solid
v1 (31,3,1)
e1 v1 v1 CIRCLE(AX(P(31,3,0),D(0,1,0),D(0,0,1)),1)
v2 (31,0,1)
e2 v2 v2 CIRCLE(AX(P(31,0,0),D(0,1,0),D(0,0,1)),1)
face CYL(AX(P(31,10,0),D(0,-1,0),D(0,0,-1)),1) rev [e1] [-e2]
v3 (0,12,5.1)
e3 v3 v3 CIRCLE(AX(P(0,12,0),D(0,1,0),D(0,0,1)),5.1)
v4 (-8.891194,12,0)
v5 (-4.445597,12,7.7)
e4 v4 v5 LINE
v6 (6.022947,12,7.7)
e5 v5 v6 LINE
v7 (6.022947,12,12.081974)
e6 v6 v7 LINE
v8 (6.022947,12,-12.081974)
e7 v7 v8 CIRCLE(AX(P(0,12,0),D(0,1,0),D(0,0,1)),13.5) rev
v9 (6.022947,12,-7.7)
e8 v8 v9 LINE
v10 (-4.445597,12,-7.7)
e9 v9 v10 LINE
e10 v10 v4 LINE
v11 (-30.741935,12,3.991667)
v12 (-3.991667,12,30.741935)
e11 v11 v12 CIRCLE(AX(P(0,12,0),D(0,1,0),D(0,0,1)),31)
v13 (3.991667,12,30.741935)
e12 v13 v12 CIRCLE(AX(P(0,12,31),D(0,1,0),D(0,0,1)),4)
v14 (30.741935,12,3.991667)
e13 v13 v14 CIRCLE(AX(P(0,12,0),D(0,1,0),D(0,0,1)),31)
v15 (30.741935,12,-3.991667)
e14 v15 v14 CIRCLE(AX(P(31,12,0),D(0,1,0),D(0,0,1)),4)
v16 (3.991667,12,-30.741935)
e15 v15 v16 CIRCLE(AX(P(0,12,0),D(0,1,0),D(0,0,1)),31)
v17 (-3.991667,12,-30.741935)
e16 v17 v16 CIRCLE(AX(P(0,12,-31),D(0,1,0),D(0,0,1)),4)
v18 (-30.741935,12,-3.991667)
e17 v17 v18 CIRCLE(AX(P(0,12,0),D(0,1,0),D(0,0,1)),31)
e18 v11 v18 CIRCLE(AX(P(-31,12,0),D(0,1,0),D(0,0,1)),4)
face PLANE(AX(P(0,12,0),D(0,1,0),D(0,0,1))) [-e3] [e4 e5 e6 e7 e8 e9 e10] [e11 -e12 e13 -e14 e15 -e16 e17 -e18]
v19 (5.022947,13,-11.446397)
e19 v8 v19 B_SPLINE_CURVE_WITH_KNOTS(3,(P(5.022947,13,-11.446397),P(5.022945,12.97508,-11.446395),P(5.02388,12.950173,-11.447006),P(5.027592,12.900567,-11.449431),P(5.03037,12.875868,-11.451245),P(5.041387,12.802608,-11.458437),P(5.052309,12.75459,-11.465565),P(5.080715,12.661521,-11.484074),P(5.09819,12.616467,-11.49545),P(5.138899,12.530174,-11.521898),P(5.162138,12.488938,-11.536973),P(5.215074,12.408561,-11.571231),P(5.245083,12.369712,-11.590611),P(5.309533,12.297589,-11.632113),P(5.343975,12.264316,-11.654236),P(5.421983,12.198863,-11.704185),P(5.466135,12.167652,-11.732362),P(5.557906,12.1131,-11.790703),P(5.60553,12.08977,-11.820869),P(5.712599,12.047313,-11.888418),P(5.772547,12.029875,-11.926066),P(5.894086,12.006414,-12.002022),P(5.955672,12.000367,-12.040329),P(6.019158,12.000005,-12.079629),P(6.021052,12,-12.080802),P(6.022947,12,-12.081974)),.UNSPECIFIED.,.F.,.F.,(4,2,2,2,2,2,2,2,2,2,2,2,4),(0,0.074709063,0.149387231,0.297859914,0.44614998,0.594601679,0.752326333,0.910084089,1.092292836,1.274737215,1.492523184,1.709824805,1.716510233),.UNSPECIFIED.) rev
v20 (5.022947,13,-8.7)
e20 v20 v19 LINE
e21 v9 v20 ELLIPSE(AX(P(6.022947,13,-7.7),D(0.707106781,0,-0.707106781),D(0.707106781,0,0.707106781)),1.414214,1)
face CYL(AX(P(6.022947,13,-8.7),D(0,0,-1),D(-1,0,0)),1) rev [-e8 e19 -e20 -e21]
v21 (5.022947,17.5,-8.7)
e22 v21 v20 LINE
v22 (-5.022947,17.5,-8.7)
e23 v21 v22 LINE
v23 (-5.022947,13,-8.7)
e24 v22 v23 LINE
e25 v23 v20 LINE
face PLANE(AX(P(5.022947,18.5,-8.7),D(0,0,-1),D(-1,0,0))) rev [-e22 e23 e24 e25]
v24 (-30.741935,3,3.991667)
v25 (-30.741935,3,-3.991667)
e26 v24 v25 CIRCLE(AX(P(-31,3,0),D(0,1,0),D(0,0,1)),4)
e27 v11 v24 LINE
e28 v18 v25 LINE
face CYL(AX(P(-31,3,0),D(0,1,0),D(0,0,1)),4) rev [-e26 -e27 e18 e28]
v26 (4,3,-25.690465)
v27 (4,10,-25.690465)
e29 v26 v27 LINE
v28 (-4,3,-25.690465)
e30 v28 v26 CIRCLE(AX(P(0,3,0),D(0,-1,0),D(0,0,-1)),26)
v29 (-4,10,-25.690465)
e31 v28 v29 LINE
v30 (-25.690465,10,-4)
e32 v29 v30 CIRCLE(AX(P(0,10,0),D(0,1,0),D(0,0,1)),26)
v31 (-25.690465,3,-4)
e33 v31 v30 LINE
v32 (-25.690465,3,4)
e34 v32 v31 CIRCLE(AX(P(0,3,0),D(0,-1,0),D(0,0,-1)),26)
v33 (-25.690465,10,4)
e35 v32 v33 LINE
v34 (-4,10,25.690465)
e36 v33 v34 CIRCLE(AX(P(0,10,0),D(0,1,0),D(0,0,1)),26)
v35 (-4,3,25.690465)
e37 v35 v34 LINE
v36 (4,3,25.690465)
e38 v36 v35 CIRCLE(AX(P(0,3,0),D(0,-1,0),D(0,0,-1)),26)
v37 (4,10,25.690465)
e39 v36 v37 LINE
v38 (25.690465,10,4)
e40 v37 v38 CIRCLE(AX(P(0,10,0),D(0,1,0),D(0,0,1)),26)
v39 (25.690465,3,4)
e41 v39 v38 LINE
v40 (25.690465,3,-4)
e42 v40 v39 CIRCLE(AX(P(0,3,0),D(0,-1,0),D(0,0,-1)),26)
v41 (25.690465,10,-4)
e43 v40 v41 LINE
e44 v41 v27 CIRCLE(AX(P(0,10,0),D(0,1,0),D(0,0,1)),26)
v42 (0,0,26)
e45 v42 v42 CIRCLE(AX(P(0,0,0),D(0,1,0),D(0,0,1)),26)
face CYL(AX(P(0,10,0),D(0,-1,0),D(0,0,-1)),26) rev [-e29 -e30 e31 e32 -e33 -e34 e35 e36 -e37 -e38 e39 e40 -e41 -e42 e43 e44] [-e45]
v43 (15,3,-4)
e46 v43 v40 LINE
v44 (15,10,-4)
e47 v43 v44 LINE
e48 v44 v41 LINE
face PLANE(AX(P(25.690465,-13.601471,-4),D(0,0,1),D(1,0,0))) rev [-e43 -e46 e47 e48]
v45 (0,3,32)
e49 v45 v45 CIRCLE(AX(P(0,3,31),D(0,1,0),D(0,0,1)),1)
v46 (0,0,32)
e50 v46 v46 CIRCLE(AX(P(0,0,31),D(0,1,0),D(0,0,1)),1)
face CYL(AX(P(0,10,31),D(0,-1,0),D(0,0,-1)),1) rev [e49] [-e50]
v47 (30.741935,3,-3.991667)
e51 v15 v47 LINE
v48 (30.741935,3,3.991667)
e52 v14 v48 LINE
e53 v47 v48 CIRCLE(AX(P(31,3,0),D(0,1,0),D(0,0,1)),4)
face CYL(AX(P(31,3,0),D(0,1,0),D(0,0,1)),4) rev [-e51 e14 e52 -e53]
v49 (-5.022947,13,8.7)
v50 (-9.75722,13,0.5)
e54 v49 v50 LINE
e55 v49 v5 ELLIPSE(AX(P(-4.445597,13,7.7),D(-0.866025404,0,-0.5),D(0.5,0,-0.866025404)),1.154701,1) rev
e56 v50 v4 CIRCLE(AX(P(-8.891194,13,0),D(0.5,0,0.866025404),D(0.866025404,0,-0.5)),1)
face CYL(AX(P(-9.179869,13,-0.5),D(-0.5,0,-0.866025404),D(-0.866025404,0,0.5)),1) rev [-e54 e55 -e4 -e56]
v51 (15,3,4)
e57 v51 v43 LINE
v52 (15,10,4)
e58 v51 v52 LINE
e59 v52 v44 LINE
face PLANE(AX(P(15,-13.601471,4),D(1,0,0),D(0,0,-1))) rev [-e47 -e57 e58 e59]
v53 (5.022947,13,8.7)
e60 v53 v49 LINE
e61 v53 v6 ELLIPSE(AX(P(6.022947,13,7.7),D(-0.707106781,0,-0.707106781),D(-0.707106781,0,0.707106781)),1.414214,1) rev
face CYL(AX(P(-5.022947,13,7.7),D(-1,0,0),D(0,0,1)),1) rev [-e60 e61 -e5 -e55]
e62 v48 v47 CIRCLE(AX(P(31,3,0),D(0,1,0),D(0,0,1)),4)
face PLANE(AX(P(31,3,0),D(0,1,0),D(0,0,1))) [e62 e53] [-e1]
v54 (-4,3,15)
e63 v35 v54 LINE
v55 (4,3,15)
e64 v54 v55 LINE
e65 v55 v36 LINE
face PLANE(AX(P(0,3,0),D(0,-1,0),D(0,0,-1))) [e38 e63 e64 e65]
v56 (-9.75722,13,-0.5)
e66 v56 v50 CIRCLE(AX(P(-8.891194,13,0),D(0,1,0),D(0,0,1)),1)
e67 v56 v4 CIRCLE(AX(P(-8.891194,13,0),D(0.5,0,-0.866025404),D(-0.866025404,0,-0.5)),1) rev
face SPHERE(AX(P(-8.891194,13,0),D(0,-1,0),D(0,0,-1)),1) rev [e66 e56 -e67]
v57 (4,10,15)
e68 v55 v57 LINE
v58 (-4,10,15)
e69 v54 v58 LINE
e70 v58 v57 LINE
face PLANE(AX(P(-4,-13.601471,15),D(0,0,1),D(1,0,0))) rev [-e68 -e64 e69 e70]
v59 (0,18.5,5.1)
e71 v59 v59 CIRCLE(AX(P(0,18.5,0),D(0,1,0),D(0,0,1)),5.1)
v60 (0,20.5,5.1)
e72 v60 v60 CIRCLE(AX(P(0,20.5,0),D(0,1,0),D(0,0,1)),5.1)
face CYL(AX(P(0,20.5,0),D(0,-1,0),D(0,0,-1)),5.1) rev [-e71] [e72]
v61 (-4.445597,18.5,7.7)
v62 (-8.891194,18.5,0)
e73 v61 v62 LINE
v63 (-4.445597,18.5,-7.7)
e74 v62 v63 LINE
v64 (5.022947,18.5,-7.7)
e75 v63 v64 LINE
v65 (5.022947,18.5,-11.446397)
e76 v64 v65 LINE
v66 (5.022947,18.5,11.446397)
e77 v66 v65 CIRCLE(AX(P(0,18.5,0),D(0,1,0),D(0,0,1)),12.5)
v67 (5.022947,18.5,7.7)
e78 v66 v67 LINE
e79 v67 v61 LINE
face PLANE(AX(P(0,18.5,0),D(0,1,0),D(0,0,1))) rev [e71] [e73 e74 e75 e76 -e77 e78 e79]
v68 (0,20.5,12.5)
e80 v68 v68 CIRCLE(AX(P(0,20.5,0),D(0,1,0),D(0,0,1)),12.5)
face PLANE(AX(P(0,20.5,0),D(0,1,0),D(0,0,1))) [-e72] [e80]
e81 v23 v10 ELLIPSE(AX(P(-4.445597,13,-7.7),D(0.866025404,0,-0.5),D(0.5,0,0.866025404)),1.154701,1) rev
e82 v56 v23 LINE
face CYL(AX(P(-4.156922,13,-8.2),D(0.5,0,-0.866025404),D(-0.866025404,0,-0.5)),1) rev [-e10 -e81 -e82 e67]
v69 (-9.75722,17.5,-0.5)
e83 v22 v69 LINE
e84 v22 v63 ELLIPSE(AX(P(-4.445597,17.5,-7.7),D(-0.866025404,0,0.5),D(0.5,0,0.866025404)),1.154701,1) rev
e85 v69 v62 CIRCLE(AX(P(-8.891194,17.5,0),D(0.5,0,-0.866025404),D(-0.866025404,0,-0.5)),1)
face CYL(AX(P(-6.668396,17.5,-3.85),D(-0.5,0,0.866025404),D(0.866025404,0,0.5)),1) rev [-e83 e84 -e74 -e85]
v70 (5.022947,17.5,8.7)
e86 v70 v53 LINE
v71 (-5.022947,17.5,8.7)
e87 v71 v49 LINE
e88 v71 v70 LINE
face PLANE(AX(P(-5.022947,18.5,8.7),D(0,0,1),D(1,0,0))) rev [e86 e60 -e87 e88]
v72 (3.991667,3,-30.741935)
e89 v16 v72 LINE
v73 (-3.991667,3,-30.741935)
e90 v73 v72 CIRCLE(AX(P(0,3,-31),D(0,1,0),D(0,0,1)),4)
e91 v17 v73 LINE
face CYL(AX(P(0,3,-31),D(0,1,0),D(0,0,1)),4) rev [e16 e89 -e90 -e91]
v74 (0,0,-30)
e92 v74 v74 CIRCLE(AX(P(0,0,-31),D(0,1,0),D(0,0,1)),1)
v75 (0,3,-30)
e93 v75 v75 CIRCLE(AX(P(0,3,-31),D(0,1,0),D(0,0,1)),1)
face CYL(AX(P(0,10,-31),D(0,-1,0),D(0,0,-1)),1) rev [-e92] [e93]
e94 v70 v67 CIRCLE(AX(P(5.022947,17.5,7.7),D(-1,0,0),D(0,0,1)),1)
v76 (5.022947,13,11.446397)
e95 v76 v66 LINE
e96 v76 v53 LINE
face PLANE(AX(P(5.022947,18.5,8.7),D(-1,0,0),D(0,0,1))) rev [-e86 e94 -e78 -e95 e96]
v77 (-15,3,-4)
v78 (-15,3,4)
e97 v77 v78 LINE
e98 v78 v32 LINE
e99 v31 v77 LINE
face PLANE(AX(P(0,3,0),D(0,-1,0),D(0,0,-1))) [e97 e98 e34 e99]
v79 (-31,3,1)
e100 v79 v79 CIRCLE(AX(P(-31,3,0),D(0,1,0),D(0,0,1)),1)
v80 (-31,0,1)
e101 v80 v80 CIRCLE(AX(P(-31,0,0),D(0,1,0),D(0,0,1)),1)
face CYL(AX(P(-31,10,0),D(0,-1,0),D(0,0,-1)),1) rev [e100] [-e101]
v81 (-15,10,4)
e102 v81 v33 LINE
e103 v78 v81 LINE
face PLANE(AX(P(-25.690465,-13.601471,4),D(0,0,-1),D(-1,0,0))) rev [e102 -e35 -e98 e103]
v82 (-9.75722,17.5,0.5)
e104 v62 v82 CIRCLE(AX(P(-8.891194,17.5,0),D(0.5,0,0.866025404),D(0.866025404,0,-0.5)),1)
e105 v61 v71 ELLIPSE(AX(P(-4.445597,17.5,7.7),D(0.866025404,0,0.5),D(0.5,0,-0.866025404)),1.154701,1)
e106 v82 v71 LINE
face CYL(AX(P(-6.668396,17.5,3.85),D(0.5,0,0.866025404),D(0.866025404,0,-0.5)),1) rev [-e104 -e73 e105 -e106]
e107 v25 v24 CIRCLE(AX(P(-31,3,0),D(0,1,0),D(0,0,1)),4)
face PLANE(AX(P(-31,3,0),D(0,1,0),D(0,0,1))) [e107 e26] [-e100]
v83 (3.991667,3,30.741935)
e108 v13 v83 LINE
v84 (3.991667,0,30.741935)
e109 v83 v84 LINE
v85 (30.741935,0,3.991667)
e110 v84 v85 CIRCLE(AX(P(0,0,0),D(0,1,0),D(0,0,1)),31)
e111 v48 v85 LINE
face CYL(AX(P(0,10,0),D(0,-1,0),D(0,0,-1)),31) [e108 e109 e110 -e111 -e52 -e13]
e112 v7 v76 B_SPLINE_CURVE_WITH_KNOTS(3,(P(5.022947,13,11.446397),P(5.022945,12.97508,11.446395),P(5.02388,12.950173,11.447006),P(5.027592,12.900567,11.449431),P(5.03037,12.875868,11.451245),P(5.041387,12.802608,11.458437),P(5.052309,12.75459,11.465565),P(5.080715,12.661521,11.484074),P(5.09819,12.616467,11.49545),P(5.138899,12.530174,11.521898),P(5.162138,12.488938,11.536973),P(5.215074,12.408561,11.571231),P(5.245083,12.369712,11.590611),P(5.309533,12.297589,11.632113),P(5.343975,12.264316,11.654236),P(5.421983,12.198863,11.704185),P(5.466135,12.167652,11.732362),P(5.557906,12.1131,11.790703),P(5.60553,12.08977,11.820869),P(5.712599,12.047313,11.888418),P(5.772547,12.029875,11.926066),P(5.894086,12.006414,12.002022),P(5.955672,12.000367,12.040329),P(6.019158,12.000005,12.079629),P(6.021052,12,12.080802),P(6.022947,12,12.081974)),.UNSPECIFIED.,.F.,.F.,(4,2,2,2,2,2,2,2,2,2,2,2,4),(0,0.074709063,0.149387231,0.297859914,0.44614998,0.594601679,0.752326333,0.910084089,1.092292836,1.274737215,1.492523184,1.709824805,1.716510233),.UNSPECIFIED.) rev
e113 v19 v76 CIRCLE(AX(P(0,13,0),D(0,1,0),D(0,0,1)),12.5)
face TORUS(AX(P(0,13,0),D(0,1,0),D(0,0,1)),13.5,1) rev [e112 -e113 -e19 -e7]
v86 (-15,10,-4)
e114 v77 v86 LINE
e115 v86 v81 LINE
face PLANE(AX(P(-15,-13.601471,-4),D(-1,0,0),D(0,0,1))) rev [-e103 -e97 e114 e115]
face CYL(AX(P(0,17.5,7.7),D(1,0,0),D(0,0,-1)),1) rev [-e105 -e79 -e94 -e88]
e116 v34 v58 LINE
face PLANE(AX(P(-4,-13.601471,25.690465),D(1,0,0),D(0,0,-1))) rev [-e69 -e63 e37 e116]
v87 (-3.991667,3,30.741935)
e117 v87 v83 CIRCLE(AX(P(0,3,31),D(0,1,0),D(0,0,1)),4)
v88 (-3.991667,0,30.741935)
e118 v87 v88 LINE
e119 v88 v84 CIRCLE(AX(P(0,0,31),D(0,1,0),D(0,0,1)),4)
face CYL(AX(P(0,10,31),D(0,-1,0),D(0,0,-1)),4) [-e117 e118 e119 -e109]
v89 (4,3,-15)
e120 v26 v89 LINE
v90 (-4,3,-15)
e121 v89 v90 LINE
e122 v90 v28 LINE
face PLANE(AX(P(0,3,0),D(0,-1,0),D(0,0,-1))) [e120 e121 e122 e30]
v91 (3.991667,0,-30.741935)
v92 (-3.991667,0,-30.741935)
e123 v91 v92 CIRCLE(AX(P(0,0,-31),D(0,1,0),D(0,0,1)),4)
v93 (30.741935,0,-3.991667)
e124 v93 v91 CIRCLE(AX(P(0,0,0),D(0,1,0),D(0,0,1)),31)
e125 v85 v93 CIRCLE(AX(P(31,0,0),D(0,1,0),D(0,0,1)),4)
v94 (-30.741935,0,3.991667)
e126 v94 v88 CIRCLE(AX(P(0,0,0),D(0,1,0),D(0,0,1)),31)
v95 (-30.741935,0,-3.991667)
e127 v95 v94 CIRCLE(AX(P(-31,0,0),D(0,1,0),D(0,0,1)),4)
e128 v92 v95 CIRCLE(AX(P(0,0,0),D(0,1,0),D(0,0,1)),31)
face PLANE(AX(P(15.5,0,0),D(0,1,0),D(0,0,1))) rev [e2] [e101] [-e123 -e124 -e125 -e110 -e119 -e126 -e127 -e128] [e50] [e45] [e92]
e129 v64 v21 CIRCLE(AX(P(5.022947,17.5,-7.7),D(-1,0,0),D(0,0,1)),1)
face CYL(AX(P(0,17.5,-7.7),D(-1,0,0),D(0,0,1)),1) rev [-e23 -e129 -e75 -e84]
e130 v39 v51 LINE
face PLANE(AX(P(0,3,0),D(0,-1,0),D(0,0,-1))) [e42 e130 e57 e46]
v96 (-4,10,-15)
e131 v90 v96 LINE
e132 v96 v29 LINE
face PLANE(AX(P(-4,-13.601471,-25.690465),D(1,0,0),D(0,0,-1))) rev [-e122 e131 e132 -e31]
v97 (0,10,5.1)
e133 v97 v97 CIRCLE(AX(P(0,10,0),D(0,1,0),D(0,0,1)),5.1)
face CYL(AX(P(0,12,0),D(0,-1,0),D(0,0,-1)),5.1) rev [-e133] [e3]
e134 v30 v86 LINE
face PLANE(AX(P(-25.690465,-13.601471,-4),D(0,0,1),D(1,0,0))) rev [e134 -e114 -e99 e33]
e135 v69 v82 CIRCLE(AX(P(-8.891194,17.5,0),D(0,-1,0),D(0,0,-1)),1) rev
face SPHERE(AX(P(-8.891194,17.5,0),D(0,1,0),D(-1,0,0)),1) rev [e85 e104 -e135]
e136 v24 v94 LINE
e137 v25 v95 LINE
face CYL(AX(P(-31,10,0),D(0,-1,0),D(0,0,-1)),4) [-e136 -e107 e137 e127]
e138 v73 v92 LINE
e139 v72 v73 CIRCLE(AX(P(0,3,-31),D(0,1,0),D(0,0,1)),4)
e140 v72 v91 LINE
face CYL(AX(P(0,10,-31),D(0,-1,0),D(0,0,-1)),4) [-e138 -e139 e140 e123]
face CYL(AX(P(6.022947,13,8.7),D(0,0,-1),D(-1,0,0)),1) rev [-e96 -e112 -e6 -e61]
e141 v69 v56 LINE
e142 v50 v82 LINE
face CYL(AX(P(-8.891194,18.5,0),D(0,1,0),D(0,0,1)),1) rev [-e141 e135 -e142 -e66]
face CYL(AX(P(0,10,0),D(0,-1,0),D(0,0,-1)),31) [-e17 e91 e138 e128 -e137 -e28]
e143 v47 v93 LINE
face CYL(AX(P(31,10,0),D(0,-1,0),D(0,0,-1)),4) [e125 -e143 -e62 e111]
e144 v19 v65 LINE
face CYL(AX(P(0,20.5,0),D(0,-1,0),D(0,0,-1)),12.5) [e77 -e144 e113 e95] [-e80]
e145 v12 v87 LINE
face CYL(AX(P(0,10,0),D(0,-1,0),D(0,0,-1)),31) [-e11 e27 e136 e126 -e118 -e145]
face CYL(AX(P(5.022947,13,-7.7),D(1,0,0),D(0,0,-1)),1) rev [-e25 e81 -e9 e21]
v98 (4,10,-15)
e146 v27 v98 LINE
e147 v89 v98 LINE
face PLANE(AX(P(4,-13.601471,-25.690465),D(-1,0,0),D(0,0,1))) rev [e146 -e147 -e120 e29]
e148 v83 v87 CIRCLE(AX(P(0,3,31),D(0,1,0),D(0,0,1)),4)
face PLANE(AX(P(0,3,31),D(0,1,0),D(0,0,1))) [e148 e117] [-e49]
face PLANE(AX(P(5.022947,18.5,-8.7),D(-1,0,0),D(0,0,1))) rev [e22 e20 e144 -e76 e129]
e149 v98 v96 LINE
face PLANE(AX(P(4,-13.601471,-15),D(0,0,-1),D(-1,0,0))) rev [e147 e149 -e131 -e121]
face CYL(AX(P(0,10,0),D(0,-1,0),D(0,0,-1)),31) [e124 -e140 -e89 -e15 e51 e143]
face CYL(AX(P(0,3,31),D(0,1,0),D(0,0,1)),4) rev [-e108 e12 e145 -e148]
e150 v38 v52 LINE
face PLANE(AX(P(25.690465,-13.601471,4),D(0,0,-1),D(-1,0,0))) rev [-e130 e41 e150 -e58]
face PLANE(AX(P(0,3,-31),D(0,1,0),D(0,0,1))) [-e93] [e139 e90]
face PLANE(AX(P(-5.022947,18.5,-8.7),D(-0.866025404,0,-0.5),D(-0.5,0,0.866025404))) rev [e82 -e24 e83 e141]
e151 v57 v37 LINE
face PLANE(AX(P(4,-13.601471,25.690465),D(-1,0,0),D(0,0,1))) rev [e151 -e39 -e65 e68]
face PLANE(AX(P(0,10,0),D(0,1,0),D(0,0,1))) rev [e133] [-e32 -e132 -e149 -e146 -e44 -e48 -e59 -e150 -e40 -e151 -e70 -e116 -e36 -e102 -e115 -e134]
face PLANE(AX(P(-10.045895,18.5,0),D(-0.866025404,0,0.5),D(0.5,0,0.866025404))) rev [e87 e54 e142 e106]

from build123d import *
from build123d.topology import SkipClean

# Parameters (mm, degrees)
SKETCH2_R           = 1
SKETCH2_R_2         = 26
BOSS_EXTRUDE1_DEPTH = 10
SKETCH3_R           = 31
SKETCH3_R_2         = 5.1
BOSS_EXTRUDE2_DEPTH = 2
BOSS_EXTRUDE3_DEPTH = 6.5
SKETCH5_R           = 12.5
SKETCH5_R_2         = 5.1
BOSS_EXTRUDE4_DEPTH = 2
FILLET1_R           = 1
BOSS_EXTRUDE5_START = 6.5
BOSS_EXTRUDE5_DEPTH = 6.5
FILLET2_R           = 1
CUT_EXTRUDE1_START  = -9
SKETCH7_R           = 4
CUT_EXTRUDE1_DEPTH  = 9
BOSS_EXTRUDE6_START = 10
BOSS_EXTRUDE6_DEPTH = 10
CIRPATTERN1_COUNT   = 4
SKETCH12_R          = 26
CUT_EXTRUDE2_DEPTH  = 3


with BuildPart() as part:
    # Sketch2 → Boss-Extrude1 (new body)
    with BuildSketch(Plane(origin=(0, 0, 0), x_dir=(1, 0, 0), z_dir=(0, 1, 0))):
        with BuildLine():
            ThreePointArc((3.991666658, 30.741935484), (0, 35), (-3.991666658, 30.741935484))
            ThreePointArc((-3.991666658, 30.741935484), (-21.920310217, 21.920310217), (-30.741935484, 3.991666658))
            ThreePointArc((-30.741935484, 3.991666658), (-35, 0), (-30.741935484, -3.991666658))
            ThreePointArc((-30.741935484, -3.991666658), (-21.920310217, -21.920310217), (-3.991666658, -30.741935484))
            ThreePointArc((-3.991666658, -30.741935484), (0, -35), (3.991666658, -30.741935484))
            ThreePointArc((3.991666658, -30.741935484), (21.920310217, -21.920310217), (30.741935484, -3.991666658))
            ThreePointArc((30.741935484, -3.991666658), (35, 0), (30.741935484, 3.991666658))
            ThreePointArc((30.741935484, 3.991666658), (21.920310217, 21.920310217), (3.991666658, 30.741935484))
        make_face()
        with Locations(Location((0, 31, 0), (0, 0, 270))):
            Circle(SKETCH2_R, mode=Mode.SUBTRACT)
        with Locations(Location((31, 0, 0), (0, 0, 270))):
            Circle(SKETCH2_R, mode=Mode.SUBTRACT)
        with Locations(Location((0, -31, 0), (0, 0, 270))):
            Circle(SKETCH2_R, mode=Mode.SUBTRACT)
        with Locations(Location((-31, 0, 0), (0, 0, 270))):
            Circle(SKETCH2_R, mode=Mode.SUBTRACT)
        with Locations(Location((0, 0, 0), (0, 0, 270))):
            Circle(SKETCH2_R_2, mode=Mode.SUBTRACT)
    extrude(amount=BOSS_EXTRUDE1_DEPTH)

    # Sketch3 → Boss-Extrude2 (add)
    with BuildSketch(Plane(origin=(0, 10, 0), x_dir=(1, 0, 0), z_dir=(0, 1, 0))):
        with Locations(Location((0, 0, 0), (0, 0, 88.151668903))):
            Circle(SKETCH3_R)
        with Locations(Location((0, 0, 0), (0, 0, 270))):
            Circle(SKETCH3_R_2, mode=Mode.SUBTRACT)
    extrude(amount=BOSS_EXTRUDE2_DEPTH)

    # Sketch4 → Boss-Extrude3 (add)
    with BuildSketch(Plane(origin=(0, 12, 0), x_dir=(1, 0, 0), z_dir=(0, 1, 0))):
        Polygon((-5.022947342, 8.7), (-10.045894684, 0), (-5.022947342, -8.7), (5.022947342, -8.7), (5.022947342, -10.7), (-6.17764788, -10.7), (-12.355295761, 0), (-6.17764788, 10.7), (5.022947342, 10.7), (5.022947342, 8.7), align=None)
    extrude(amount=BOSS_EXTRUDE3_DEPTH)

    # Sketch5 → Boss-Extrude4 (add)
    with BuildSketch(Plane(origin=(0, 18.5, 0), x_dir=(1, 0, 0), z_dir=(0, 1, 0))):
        with Locations(Location((0, 0, 0), (0, 0, 270))):
            Circle(SKETCH5_R)
        with Locations(Location((0, 0, 0), (0, 0, 270))):
            Circle(SKETCH5_R_2, mode=Mode.SUBTRACT)
    extrude(amount=BOSS_EXTRUDE4_DEPTH)

    # Fillet1
    fillet1_edges = [part.edges().sort_by_distance(p)[0] for p in [
        (0, 12, -8.7),
        (0, 12, 8.7),
        (-7.534421013, 12, 4.35),
        (-7.534421013, 12, -4.35),
        (-10.045894684, 15.25, 0),
        (0, 18.5, -8.7),
        (0, 18.5, 8.7),
        (-7.534421013, 18.5, 4.35),
        (-7.534421013, 18.5, -4.35),
    ]]
    fillet(fillet1_edges, radius=FILLET1_R)

    # Sketch6 → Boss-Extrude5 (add)
    with SkipClean():  # the faces are left unmerged after this step: merging them gives an invalid solid
        with BuildSketch(Plane.XZ.offset(-18.5).offset(BOSS_EXTRUDE5_START)):
            with BuildLine():
                Line((-6.17764788, -10.7), (-12.355295761, 0))
                Line((-12.355295761, 0), (-6.17764788, 10.7))
                Line((-6.17764788, 10.7), (5.022947342, 10.7))
                Line((5.022947342, 10.7), (5.022947342, 11.446396813))
                ThreePointArc((5.022947342, 11.446396813), (-12.5, 0), (5.022947342, -11.446396813))
                Line((5.022947342, -11.446396813), (5.022947342, -10.7))
                Line((5.022947342, -10.7), (-6.17764788, -10.7))
            make_face()
        extrude(amount=-BOSS_EXTRUDE5_DEPTH)

    # Fillet2
    fillet2_edges = [part.edges().sort_by_distance(p)[0] for p in [
        (-12.5, 12, 0),
        (5.022947342, 12, -9.2),
        (5.022947342, 12, 9.2),
    ]]
    fillet(fillet2_edges, radius=FILLET2_R)

    # Sketch7 → Cut-Extrude1 (cut)
    with BuildSketch(Plane(origin=(0, 12, 0), x_dir=(1, 0, 0), z_dir=(0, 1, 0)).offset(CUT_EXTRUDE1_START)):
        with Locations((0, -31)):
            Circle(SKETCH7_R)
        with Locations((31, 0)):
            Circle(SKETCH7_R)
        with Locations((0, 31)):
            Circle(SKETCH7_R)
        with Locations((-31, 0)):
            Circle(SKETCH7_R)
    extrude(amount=CUT_EXTRUDE1_DEPTH, mode=Mode.SUBTRACT)

    # Sketch10 → Boss-Extrude6 (add)
    with BuildSketch(Plane.XZ.offset(-10).offset(BOSS_EXTRUDE6_START)):
        with BuildLine():
            Line((-4, 25.690465157), (-4, 15))
            Line((-4, 15), (4, 15))
            Line((4, 15), (4, 25.690465157))
            ThreePointArc((4, 25.690465157), (0, 26), (-4, 25.690465157))
        make_face()
    boss_extrude6 = extrude(amount=-BOSS_EXTRUDE6_DEPTH)

    # CirPattern1: Boss-Extrude6 ×4 about axis
    cirpattern1_axis = Axis((0, 0, 0), (0, 1, 0))
    for i in range(1, CIRPATTERN1_COUNT):
        add(boss_extrude6.rotate(cirpattern1_axis, i * 360 / CIRPATTERN1_COUNT))

    # Sketch12 → Cut-Extrude2 (cut)
    with SkipClean():  # the faces are left unmerged after this step: merging them gives an invalid solid
        with BuildSketch(Plane.XZ):
            with Locations(Location((0, 0, 0), (0, 0, 261.150116902))):
                Circle(SKETCH12_R)
        extrude(amount=-CUT_EXTRUDE2_DEPTH, mode=Mode.SUBTRACT)
    add(part.part.scale(1), mode=Mode.REPLACE)  # the faces are merged on a copy


solid = part.part
